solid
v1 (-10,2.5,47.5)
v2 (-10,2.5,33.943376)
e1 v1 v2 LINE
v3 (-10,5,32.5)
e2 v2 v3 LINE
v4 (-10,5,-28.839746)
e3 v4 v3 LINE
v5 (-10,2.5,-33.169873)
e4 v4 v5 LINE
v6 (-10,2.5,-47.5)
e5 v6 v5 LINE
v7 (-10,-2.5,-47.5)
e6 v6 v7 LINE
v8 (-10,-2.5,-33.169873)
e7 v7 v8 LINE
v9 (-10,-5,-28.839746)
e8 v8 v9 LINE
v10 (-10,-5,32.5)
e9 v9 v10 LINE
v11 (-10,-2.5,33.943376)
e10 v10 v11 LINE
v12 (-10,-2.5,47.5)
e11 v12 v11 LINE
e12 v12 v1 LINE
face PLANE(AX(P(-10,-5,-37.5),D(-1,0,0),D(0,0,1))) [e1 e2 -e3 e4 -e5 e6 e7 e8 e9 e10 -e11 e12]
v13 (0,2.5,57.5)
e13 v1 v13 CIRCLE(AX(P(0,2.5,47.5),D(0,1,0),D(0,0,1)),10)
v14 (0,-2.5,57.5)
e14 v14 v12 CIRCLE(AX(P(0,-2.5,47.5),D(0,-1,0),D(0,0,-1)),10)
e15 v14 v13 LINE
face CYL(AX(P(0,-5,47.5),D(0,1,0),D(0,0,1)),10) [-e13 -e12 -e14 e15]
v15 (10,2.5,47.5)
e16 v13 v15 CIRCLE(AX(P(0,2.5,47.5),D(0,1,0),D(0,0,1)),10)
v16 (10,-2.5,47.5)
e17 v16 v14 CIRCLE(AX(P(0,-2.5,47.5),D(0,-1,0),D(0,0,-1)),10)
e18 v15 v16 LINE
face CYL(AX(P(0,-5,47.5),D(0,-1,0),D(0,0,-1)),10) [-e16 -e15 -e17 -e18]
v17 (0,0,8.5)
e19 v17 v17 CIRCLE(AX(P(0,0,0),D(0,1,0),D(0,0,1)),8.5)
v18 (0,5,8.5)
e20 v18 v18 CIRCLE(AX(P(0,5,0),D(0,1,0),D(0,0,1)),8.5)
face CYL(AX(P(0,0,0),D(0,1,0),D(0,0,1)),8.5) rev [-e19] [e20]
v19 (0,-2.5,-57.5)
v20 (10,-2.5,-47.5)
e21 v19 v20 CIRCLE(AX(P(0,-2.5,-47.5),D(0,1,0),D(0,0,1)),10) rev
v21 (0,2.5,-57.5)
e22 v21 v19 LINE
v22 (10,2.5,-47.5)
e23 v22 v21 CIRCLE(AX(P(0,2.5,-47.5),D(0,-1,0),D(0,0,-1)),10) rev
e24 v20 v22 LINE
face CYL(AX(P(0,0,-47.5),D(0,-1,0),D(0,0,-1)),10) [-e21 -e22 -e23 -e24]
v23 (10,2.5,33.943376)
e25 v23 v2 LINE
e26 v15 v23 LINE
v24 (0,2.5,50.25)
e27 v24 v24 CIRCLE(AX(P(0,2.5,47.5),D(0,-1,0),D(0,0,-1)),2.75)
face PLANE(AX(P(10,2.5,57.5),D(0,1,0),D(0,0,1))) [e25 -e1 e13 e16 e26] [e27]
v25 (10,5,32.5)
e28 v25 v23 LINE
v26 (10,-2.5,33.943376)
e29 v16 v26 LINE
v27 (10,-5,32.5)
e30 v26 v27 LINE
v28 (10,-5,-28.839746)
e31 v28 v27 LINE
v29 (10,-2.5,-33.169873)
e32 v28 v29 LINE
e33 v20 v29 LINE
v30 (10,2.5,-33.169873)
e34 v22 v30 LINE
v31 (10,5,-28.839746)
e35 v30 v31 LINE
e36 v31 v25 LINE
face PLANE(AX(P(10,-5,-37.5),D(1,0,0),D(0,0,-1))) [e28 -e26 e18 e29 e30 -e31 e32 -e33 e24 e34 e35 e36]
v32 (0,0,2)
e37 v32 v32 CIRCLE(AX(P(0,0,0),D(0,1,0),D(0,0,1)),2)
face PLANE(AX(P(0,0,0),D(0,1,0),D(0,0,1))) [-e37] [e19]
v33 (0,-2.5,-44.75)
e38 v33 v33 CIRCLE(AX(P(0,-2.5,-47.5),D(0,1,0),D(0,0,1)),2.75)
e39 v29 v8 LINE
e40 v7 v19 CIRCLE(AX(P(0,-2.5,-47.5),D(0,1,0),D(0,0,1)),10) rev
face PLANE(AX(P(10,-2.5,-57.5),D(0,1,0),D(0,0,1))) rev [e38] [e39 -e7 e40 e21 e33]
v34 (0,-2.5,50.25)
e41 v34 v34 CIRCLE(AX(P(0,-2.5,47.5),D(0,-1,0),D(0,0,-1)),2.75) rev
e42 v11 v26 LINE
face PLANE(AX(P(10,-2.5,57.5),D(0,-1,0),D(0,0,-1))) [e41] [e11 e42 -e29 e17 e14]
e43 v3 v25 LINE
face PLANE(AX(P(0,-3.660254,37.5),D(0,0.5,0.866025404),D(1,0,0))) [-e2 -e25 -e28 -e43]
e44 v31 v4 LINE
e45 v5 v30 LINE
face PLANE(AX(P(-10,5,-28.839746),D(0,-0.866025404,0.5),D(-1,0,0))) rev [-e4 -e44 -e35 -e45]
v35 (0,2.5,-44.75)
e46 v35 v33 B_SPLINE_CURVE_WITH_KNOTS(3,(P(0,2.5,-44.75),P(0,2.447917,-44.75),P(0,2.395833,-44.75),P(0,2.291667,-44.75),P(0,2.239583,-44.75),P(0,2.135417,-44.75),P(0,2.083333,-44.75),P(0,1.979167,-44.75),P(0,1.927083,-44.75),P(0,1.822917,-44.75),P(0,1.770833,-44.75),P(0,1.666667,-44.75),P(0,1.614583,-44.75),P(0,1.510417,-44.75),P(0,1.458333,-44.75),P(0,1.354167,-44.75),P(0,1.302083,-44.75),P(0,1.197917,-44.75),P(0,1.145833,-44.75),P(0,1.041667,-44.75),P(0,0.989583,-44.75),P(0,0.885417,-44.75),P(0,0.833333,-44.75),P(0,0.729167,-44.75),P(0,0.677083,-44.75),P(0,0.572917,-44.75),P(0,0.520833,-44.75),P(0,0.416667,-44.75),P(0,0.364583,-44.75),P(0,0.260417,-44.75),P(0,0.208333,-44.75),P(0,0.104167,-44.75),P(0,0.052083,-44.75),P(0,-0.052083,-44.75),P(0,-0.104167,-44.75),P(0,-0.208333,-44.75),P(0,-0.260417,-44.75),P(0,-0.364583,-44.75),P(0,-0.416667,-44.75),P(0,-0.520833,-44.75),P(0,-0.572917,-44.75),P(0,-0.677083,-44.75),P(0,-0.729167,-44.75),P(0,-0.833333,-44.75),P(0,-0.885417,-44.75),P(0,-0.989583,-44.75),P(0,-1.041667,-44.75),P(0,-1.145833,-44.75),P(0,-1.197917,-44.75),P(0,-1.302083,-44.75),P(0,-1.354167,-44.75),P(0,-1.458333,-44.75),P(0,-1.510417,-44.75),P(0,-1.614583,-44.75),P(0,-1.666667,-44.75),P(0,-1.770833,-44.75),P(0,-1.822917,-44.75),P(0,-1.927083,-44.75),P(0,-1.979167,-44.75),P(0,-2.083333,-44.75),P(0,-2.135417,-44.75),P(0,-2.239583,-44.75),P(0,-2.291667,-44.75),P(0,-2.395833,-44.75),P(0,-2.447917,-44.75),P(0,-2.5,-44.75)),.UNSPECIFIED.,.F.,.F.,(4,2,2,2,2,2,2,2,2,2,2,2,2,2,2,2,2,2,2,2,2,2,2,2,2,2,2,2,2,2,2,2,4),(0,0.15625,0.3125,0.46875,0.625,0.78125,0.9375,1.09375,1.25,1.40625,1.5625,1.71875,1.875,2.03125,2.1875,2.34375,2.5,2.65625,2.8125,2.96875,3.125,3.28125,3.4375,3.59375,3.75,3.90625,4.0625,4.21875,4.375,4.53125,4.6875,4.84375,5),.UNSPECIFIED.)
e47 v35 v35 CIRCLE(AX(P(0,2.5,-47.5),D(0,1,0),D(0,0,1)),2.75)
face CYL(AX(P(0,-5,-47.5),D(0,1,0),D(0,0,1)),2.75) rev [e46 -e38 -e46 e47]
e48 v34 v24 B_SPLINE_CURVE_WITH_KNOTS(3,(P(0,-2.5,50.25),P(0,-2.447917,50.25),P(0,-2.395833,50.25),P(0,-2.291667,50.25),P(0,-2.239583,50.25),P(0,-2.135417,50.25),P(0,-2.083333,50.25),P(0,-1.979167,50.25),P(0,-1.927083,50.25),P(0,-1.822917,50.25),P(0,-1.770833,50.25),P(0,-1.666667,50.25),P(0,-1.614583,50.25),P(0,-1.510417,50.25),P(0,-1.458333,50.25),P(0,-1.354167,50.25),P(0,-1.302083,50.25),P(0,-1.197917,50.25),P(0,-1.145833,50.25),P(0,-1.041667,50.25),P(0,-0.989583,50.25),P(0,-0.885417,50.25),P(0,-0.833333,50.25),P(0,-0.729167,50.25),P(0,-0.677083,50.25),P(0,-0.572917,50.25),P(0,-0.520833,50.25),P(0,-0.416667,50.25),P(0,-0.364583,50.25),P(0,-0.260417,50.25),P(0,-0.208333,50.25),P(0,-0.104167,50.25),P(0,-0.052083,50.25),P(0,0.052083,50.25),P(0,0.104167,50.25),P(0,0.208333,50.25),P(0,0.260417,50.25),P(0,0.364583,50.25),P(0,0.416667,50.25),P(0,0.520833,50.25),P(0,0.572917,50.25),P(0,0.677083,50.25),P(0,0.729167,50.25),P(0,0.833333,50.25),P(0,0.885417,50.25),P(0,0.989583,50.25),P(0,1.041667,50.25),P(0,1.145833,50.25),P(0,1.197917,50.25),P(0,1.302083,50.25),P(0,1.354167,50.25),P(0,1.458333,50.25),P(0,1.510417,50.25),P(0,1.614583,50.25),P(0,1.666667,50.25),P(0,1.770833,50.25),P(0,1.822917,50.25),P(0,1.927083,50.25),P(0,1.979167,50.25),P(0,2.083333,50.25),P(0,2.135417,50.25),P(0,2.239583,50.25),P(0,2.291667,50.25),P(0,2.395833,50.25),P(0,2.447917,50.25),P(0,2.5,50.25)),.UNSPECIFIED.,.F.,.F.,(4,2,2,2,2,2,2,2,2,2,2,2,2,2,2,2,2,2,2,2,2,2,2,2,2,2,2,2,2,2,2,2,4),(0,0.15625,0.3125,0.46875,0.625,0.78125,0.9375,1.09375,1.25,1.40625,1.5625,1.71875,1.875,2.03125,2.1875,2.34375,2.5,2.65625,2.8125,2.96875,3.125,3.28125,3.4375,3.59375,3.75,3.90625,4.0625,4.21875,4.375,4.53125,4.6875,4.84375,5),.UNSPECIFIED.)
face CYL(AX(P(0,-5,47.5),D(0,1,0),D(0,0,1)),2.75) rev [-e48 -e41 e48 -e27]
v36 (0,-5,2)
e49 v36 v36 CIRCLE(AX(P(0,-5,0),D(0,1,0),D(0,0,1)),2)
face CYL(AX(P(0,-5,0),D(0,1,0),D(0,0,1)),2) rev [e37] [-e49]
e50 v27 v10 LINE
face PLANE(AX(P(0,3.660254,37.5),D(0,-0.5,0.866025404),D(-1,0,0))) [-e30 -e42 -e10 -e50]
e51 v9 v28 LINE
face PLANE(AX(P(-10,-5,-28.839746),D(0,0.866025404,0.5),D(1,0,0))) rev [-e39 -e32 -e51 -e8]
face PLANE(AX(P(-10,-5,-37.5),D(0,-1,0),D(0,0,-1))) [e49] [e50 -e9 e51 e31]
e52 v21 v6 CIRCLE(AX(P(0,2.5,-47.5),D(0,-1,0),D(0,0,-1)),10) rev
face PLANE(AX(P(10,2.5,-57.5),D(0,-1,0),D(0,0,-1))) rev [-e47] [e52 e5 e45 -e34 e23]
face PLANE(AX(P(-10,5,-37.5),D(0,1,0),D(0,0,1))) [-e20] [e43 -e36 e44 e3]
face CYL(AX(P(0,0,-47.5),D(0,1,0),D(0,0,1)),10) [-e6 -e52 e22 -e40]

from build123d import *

# Parameters (mm, degrees)
BOSS_EXTRUDE1_DEPTH      = 37.5
BOSS_EXTRUDE1_DEPTH_BACK = 37.5
SKETCH1_W                = 20
SKETCH1_H                = 10
SKETCH3_W                = 20
SKETCH3_H                = 5
BOSS_EXTRUDE2_DEPTH      = 20
FILLET1_R                = 10
SKETCH4_R                = 2.75
CUT_EXTRUDE1_DEPTH       = 59.84301148
FILLET1_OF_MIRROR3_R     = 10
CHAMFER1_SIZE            = 8.660254038
CHAMFER1_SIZE_2          = 5
SKETCH6_R                = 8.5
CUT_EXTRUDE2_DEPTH       = 5
CUT_EXTRUDE3_DEPTH       = 59.576872569
CUT_EXTRUDE3_DEPTH_BACK  = 59.576872569
SKETCH7_R                = 2


# Some blends are built 0.0001 mm under size
with BuildPart() as part:
    # Sketch1 → Boss-Extrude1 (new, two sides: drawn at the far end of the back side and taken through both)
    with BuildSketch(Plane.XY.offset(-BOSS_EXTRUDE1_DEPTH_BACK)):
        Rectangle(SKETCH1_W, SKETCH1_H)
    extrude(amount=BOSS_EXTRUDE1_DEPTH + BOSS_EXTRUDE1_DEPTH_BACK)

    # Sketch3 → Boss-Extrude2 (add)
    with BuildSketch(Plane(origin=(0, 0, -37.5), x_dir=(-1, 0, 0), z_dir=(0, 0, -1))):
        Rectangle(SKETCH3_W, SKETCH3_H)
    boss_extrude2 = extrude(amount=BOSS_EXTRUDE2_DEPTH)

    # Fillet1
    fillet1_edges = [part.edges().sort_by_distance(p)[0] for p in [
        (-10, 0, -57.5),
        (10, 0, -57.5),
    ]]
    fillet(fillet1_edges, radius=FILLET1_R - 0.0001)  # a hair under: the kernel refuses the full size

    # Sketch4 → Cut-Extrude1 (cut, through all)
    with BuildSketch(Plane(origin=(0, 2.5, 0), x_dir=(1, 0, 0), z_dir=(0, 1, 0))):
        with Locations(Location((0, 47.5, 0), (0, 0, 270))):
            Circle(SKETCH4_R)
    cut_extrude1 = extrude(amount=-CUT_EXTRUDE1_DEPTH, mode=Mode.SUBTRACT)

    # Mirror3: Boss-Extrude2, Cut-Extrude1 across plane
    add(boss_extrude2.mirror(Plane.XY))
    add(cut_extrude1.mirror(Plane.XY), mode=Mode.SUBTRACT)

    # Fillet1 of Mirror3
    fillet1_of_mirror3_edges = [part.edges().sort_by_distance(p)[0] for p in [
        (-10, 0, 57.5),
        (10, 0, 57.5),
    ]]
    fillet(fillet1_of_mirror3_edges, radius=FILLET1_OF_MIRROR3_R - 0.0001)  # a hair under: the kernel refuses the full size

    # Chamfer1
    # the kernel refuses this chamfer: 8.660254038, 5 mm, written as the material it takes off along each edge
    with BuildSketch(Plane(origin=(32.404819853, 5, -37.5), x_dir=(0, 0.019326765612700598, 0.9998132206222078), z_dir=(-1, 0, 0))) as chamfer1_piece_1_section:
        Polygon((CHAMFER1_SIZE * 0.999813220604, -CHAMFER1_SIZE * 0.0193267656124), (-CHAMFER1_SIZE_2 * 0.0193267656127, -CHAMFER1_SIZE_2 * 0.999813220622), (0, 0), align=None)
    chamfer1_piece_1 = extrude(amount=64.809639706, mode=Mode.PRIVATE)
    chamfer1_piece_1 = split(chamfer1_piece_1, bisect_by=Plane(origin=(0, 2.5, -34.039331058), z_dir=(0, 1, 0)), keep=Keep.TOP, mode=Mode.PRIVATE)
    add(chamfer1_piece_1, mode=Mode.SUBTRACT)
    with BuildSketch(Plane(origin=(-32.404819853, -5, -37.5), x_dir=(0, -0.019326765612700598, 0.9998132206222078), z_dir=(1, 0, 0))) as chamfer1_piece_2_section:
        Polygon((CHAMFER1_SIZE * 0.999813220604, -CHAMFER1_SIZE * 0.0193267656124), (-CHAMFER1_SIZE_2 * 0.0193267656127, -CHAMFER1_SIZE_2 * 0.999813220622), (0, 0), align=None)
    chamfer1_piece_2 = extrude(amount=64.809639706, mode=Mode.PRIVATE)
    chamfer1_piece_2 = split(chamfer1_piece_2, bisect_by=Plane(origin=(0, -2.5, -34.039331058), z_dir=(0, -1, 0)), keep=Keep.TOP, mode=Mode.PRIVATE)
    add(chamfer1_piece_2, mode=Mode.SUBTRACT)
    with BuildSketch(Plane(origin=(-32.404819853, -5, 37.5), x_dir=(0, 0.999813220622208, 0.019326765612700494), z_dir=(1, 0, 0))) as chamfer1_piece_3_section:
        Polygon((CHAMFER1_SIZE * 0.999813220604, -CHAMFER1_SIZE * 0.0193267656124), (-CHAMFER1_SIZE_2 * 0.0193267656127, -CHAMFER1_SIZE_2 * 0.999813220622), (0, 0), align=None)
    chamfer1_piece_3 = extrude(amount=64.809639706, mode=Mode.PRIVATE)
    chamfer1_piece_3 = split(chamfer1_piece_3, bisect_by=Plane(origin=(0, 2.5, 37.476500167), z_dir=(0, 1, 0)), keep=Keep.TOP, mode=Mode.PRIVATE)
    add(chamfer1_piece_3, mode=Mode.SUBTRACT)
    with BuildSketch(Plane(origin=(-32.404819853, -5, 37.5), x_dir=(0, 0.999813220622208, 0.019326765612700494), z_dir=(1, 0, 0))) as chamfer1_piece_4_section:
        Polygon((CHAMFER1_SIZE * 0.999813220604, -CHAMFER1_SIZE * 0.0193267656124), (-CHAMFER1_SIZE_2 * 0.0193267656127, -CHAMFER1_SIZE_2 * 0.999813220622), (0, 0), align=None)
    chamfer1_piece_4 = extrude(amount=64.809639706, mode=Mode.PRIVATE)
    chamfer1_piece_4 = split(chamfer1_piece_4, bisect_by=Plane(origin=(0, -2.5, 35.327003025), z_dir=(0, -1, 0)), keep=Keep.TOP, mode=Mode.PRIVATE)
    add(chamfer1_piece_4, mode=Mode.SUBTRACT)
    with BuildSketch(Plane(origin=(32.404819853, 5, 37.5), x_dir=(0, -0.999813220622208, 0.019326765612700494), z_dir=(-1, 0, 0))) as chamfer1_piece_5_section:
        Polygon((CHAMFER1_SIZE * 0.999813220604, -CHAMFER1_SIZE * 0.0193267656124), (-CHAMFER1_SIZE_2 * 0.0193267656127, -CHAMFER1_SIZE_2 * 0.999813220622), (0, 0), align=None)
    chamfer1_piece_5 = extrude(amount=64.809639706, mode=Mode.PRIVATE)
    chamfer1_piece_5 = split(chamfer1_piece_5, bisect_by=Plane(origin=(0, -2.5, 37.476500167), z_dir=(0, -1, 0)), keep=Keep.TOP, mode=Mode.PRIVATE)
    add(chamfer1_piece_5, mode=Mode.SUBTRACT)
    with BuildSketch(Plane(origin=(32.404819853, 5, 37.5), x_dir=(0, -0.999813220622208, 0.019326765612700494), z_dir=(-1, 0, 0))) as chamfer1_piece_6_section:
        Polygon((CHAMFER1_SIZE * 0.999813220604, -CHAMFER1_SIZE * 0.0193267656124), (-CHAMFER1_SIZE_2 * 0.0193267656127, -CHAMFER1_SIZE_2 * 0.999813220622), (0, 0), align=None)
    chamfer1_piece_6 = extrude(amount=64.809639706, mode=Mode.PRIVATE)
    chamfer1_piece_6 = split(chamfer1_piece_6, bisect_by=Plane(origin=(0, 2.5, 35.327003025), z_dir=(0, 1, 0)), keep=Keep.TOP, mode=Mode.PRIVATE)
    add(chamfer1_piece_6, mode=Mode.SUBTRACT)

    # Sketch6 → Cut-Extrude2 (cut)
    with BuildSketch(Plane(origin=(0, 5, 0), x_dir=(1, 0, 0), z_dir=(0, 1, 0))):
        with Locations(Location((0, 0, 0), (0, 0, 270))):
            Circle(SKETCH6_R)
    extrude(amount=-CUT_EXTRUDE2_DEPTH, mode=Mode.SUBTRACT)

    # Sketch7 → Cut-Extrude3 (cut, two sides: drawn at the far end of the back side and taken through both)
    with BuildSketch(Plane(origin=(0, 0, 0), x_dir=(1, 0, 0), z_dir=(0, 1, 0)).offset(-CUT_EXTRUDE3_DEPTH_BACK)):
        with Locations(Location((0, 0, 0), (0, 0, 270))):
            Circle(SKETCH7_R)
    extrude(amount=CUT_EXTRUDE3_DEPTH + CUT_EXTRUDE3_DEPTH_BACK, mode=Mode.SUBTRACT)


solid = part.part
